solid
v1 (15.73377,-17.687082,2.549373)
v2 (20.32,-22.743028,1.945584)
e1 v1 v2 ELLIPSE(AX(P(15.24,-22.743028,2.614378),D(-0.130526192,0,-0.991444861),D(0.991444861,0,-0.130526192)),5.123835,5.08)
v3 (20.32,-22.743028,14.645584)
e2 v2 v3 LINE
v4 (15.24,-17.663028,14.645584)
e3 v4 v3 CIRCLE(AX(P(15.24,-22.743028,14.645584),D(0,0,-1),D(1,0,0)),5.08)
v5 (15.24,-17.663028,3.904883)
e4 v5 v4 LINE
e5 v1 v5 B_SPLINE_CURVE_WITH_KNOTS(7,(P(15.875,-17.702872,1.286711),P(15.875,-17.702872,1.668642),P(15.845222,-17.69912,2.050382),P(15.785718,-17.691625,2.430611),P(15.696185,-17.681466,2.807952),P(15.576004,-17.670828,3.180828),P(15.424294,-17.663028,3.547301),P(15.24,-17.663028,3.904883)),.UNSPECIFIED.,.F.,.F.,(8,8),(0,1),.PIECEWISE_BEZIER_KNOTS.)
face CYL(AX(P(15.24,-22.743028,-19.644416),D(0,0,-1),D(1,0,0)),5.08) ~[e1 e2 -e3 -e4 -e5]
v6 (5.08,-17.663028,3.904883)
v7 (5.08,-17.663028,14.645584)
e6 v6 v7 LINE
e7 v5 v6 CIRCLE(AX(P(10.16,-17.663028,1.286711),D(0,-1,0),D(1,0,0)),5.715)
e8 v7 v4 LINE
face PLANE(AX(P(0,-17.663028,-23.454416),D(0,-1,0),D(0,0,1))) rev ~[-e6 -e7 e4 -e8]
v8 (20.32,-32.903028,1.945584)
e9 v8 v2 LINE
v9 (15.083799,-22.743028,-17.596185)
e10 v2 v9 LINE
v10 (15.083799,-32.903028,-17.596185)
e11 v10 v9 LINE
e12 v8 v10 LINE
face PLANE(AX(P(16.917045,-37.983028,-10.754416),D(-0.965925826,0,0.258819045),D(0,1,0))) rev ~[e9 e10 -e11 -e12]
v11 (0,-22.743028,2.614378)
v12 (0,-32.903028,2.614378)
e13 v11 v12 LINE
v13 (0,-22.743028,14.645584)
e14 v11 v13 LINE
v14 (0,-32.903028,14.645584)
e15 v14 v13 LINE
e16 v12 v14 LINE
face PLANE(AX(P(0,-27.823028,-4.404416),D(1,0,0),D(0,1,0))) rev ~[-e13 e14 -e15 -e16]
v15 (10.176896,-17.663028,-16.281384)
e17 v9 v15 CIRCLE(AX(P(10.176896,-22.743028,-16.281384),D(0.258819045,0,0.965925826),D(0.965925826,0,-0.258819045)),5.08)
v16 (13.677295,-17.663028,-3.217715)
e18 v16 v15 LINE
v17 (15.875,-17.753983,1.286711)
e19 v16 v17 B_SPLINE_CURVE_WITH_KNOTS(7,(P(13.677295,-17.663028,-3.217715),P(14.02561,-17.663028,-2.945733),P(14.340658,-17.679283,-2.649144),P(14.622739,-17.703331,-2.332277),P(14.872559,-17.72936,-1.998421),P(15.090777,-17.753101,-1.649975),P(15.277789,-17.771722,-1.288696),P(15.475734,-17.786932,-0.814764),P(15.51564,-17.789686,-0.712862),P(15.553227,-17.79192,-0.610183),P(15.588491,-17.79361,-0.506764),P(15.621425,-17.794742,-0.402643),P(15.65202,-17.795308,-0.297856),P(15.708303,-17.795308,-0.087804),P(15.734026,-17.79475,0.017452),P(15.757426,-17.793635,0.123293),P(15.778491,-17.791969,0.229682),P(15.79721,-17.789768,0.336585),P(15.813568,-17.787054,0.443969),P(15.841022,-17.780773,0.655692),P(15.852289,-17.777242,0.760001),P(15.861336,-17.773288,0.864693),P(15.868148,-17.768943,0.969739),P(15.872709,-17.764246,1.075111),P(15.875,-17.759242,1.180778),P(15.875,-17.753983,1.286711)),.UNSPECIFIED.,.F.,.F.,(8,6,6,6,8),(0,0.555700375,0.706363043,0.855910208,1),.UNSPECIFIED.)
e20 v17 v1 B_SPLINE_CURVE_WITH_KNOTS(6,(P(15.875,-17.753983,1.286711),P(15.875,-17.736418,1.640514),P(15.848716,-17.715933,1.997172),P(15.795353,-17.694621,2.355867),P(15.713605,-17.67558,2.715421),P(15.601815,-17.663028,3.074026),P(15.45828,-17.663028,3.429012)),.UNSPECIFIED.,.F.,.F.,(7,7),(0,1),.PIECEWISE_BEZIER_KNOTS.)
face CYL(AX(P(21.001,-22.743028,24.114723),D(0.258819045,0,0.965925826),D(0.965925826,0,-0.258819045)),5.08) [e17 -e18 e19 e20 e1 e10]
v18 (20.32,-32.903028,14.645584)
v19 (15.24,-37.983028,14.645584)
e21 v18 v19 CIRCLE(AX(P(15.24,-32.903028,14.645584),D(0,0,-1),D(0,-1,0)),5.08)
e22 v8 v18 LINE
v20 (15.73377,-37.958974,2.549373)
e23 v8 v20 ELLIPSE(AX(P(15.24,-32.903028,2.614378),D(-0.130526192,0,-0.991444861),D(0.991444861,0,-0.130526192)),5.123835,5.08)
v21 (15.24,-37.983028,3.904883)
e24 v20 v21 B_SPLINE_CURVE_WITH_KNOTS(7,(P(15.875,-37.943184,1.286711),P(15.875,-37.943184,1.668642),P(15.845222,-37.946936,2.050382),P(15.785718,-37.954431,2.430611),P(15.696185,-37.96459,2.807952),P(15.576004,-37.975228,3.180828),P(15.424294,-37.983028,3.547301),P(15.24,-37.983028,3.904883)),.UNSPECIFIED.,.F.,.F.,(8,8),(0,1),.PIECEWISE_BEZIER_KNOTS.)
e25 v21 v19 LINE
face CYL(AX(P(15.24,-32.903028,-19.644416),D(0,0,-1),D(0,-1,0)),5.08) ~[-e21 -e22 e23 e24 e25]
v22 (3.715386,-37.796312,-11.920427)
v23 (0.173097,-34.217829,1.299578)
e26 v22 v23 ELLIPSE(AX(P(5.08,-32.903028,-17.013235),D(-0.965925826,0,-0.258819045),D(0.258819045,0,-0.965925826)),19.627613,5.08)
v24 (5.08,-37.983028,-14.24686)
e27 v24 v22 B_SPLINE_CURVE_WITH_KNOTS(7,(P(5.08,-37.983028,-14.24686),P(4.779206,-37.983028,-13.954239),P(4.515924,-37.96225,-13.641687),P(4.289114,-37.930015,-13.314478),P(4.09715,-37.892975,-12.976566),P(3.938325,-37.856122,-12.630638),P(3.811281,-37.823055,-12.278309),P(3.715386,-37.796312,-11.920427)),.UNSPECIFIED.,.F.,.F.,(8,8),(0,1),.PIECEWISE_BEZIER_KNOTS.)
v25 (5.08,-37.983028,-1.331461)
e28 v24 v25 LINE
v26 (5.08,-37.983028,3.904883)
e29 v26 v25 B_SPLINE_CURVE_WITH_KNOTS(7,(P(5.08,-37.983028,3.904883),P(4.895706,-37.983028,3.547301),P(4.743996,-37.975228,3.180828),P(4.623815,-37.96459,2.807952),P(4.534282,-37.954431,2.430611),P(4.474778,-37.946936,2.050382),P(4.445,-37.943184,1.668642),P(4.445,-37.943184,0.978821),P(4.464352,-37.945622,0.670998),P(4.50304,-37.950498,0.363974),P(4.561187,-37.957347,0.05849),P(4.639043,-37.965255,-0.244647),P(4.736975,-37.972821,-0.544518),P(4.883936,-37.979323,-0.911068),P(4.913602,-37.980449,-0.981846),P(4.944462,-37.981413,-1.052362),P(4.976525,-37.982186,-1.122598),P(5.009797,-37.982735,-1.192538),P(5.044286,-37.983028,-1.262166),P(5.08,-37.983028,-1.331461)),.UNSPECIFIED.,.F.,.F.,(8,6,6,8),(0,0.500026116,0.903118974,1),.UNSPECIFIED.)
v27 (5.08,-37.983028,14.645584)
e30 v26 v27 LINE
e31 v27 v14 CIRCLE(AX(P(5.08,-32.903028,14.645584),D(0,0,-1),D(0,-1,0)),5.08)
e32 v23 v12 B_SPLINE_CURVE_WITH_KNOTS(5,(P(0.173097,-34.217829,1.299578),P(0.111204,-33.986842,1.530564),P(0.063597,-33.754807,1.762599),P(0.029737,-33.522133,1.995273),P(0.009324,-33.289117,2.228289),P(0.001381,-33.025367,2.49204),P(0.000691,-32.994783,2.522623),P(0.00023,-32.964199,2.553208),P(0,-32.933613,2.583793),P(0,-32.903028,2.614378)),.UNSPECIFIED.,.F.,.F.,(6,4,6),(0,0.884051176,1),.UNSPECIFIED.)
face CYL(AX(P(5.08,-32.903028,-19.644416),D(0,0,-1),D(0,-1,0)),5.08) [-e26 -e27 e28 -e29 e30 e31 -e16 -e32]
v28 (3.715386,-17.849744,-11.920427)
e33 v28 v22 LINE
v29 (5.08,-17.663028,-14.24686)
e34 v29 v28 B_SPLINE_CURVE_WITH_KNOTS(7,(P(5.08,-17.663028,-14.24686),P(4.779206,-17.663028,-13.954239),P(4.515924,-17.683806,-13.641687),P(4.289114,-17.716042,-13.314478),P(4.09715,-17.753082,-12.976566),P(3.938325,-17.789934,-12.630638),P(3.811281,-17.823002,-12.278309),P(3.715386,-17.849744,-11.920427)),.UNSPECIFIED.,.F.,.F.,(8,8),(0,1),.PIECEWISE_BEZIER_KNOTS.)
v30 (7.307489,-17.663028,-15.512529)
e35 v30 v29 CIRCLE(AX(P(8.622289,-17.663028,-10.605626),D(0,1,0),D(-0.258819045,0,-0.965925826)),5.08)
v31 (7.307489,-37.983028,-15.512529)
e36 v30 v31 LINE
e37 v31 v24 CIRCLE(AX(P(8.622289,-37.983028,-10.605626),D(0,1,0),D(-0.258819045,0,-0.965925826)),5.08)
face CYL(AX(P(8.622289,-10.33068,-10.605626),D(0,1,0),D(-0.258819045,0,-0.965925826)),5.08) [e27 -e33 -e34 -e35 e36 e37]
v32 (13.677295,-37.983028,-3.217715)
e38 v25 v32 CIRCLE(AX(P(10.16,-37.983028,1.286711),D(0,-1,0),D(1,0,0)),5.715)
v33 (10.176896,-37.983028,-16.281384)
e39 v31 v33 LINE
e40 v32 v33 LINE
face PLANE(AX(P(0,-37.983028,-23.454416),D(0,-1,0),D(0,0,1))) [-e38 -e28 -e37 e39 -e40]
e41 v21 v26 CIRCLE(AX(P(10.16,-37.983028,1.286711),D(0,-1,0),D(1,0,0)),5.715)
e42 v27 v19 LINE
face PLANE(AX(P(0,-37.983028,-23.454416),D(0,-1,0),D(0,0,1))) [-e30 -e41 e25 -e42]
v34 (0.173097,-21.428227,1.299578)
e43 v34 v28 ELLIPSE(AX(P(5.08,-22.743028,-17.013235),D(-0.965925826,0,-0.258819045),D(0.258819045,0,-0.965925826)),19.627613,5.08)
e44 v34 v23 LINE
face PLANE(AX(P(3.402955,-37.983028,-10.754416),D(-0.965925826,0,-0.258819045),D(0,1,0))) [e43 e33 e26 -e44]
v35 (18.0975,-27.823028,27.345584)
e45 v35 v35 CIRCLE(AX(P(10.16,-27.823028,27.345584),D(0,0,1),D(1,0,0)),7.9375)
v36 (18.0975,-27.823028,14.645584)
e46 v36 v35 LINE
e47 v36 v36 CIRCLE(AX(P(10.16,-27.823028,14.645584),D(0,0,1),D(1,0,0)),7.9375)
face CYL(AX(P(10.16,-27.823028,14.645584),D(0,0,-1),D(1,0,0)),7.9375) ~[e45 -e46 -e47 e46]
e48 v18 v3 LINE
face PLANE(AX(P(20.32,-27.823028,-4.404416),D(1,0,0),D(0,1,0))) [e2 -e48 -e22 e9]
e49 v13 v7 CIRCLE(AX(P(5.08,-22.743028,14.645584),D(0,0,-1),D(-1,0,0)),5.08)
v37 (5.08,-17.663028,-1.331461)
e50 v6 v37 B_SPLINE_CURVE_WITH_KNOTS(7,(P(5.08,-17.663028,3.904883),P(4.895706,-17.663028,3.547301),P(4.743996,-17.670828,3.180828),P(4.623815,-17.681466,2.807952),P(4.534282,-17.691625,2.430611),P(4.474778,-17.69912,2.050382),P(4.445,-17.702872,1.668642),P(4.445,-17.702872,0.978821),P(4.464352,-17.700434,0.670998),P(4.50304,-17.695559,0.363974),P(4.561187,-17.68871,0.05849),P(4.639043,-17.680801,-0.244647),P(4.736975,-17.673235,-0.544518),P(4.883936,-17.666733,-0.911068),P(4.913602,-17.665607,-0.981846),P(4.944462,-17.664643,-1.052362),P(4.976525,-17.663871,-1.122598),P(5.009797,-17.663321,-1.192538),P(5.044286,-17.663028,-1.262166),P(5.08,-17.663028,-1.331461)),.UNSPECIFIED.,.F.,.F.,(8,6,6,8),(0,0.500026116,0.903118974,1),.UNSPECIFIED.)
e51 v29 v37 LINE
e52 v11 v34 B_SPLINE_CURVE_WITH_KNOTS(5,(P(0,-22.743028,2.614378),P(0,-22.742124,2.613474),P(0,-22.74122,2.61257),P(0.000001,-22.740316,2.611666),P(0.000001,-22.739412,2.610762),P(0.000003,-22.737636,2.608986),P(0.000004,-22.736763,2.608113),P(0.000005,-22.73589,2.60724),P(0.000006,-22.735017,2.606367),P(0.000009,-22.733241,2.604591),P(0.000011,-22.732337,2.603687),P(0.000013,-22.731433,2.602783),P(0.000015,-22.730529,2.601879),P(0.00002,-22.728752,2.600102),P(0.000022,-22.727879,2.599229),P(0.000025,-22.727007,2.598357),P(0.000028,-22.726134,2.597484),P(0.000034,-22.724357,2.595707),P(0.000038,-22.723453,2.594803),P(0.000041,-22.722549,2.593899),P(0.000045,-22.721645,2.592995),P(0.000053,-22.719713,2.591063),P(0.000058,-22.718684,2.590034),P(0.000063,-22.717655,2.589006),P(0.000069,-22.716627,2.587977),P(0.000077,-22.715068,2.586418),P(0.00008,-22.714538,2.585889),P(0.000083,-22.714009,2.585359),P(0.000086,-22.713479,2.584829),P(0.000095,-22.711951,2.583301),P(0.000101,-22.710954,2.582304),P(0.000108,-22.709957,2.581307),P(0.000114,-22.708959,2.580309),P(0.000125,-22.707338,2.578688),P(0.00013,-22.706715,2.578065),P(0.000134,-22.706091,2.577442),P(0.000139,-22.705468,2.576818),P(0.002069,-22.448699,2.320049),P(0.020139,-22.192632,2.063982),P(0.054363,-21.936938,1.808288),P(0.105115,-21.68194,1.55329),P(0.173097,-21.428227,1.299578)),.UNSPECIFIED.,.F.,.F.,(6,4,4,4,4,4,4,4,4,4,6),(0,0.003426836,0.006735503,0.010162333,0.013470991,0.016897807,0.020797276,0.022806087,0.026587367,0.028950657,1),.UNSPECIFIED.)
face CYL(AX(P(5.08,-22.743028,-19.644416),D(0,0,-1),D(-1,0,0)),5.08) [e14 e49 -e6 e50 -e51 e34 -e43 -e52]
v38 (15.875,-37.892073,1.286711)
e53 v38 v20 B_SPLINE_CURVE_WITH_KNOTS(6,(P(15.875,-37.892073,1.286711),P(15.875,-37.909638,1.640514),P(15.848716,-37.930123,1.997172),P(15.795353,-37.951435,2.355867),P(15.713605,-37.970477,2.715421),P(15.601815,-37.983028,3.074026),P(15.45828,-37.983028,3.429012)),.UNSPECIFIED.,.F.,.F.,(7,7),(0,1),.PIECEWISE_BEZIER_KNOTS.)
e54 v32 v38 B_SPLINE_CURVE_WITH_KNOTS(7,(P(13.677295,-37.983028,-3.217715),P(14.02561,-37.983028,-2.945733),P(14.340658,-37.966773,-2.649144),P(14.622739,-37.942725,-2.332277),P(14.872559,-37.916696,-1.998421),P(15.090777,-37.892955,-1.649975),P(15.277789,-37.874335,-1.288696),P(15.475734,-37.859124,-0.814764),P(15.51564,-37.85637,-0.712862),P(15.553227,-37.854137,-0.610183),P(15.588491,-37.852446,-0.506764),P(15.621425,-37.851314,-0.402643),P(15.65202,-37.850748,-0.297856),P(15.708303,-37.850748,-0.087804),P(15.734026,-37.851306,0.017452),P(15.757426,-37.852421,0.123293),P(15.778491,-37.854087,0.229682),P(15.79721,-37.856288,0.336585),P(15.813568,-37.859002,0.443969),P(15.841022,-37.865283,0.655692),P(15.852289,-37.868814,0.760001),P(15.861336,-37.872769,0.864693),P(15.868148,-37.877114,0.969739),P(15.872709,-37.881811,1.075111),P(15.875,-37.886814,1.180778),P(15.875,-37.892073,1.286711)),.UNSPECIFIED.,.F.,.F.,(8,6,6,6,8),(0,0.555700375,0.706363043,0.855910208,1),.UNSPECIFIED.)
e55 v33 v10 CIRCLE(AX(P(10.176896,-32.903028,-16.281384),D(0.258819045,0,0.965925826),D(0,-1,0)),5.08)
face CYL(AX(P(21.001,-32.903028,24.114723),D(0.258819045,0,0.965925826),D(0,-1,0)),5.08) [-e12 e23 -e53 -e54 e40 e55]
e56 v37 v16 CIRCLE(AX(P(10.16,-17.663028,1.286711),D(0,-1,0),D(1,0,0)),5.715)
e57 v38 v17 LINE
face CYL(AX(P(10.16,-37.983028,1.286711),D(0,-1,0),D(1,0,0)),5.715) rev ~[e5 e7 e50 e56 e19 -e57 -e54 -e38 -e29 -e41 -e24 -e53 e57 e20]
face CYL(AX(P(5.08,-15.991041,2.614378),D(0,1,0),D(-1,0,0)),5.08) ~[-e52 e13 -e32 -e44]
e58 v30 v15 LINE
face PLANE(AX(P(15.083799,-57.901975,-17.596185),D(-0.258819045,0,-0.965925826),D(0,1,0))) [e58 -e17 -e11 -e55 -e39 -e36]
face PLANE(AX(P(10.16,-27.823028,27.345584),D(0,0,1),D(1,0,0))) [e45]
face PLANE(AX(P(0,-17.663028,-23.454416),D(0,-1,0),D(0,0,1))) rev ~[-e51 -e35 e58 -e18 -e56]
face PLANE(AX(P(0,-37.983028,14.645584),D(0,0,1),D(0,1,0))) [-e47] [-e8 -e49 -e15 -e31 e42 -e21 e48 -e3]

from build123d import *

# Parameters (mm, degrees)
F0_W        = 20.32
F0_H        = 38.1
F1_DEPTH    = 20.32
F2_SIZE2    = 6.8059094878
F2_SIZE     = 25.4
F2_2_SIZE2  = 6.8059094878
F2_2_SIZE   = 25.4
F3_R        = 5.715
F4_DEPTH    = 25.4
F5_W        = 68.5800006613
F5_H        = 10.5876065791
F6_DEPTH    = 35.56
F7_R        = 7.9375
F8_DEPTH    = 12.7
F9_T1_DEPTH = 46.99
F9_T3_DEPTH = 54.5211276147
F9_T5_DEPTH = 34.9846968374
F9_T7_DEPTH = 23.6639734387


# Not quite as in the source:
# - a fillet or chamfer that OpenCascade refuses, or shapes differently, is made with other operations: its cross-section is extruded or revolved along the edge and cut away or added


with BuildPart() as f1:
    # F0 (on Right) → F1 (new body)
    with BuildSketch(Plane.YZ):
        with Locations((-27.8230281547, -4.4044164286)):
            Rectangle(F0_W, F0_H)
    extrude(amount=F1_DEPTH)

    # F2
    f2_edges = [f1.edges().sort_by_distance(p)[0] for p in [
        (20.32, -27.823028, -23.454416),
    ]]
    f2_side = f1.faces().sort_by_distance((20.32, -27.823028, -4.404416))[0]
    chamfer(f2_edges, length=F2_SIZE, length2=F2_SIZE2, reference=f2_side)

    # F2#2
    f2_2_edges = [f1.edges().sort_by_distance(p)[0] for p in [
        (0, -27.823028, -23.454416),
    ]]
    f2_2_side = f1.faces().sort_by_distance((0, -27.823028, -4.404416))[0]
    chamfer(f2_2_edges, length=F2_2_SIZE, length2=F2_2_SIZE2, reference=f2_2_side)

    # F3 (on face) → F4 (cut)
    with BuildSketch(Plane.XZ.offset(37.9830281547)):
        with Locations((10.16, 1.2867113903)):
            Circle(F3_R)
    extrude(amount=-F4_DEPTH, mode=Mode.SUBTRACT)

    # F5 (on face) → F6 (cut)
    with BuildSketch(Plane(origin=(18.4724222096, 0, -4.9496706133), x_dir=(0, 1, 0), z_dir=(0.9659258263, 0, -0.2588190451))):
        with Locations((-23.6119744368, -18.386438489)):
            Rectangle(F5_W, F5_H)
    extrude(amount=-F6_DEPTH, mode=Mode.SUBTRACT)

    # F7 (on face) → F8 (join)
    with BuildSketch(Plane.XY.offset(14.6455835714)):
        with Locations((10.16, -27.8230281547)):
            Circle(F7_R)
    extrude(amount=F8_DEPTH)

    # F9: fillet of radius 5.08 on 8 edges, made by hand

    # F9_s2 → F9_t1 (cut)
    with BuildSketch(Plane.XY.offset(-19.6444164286)):
        with BuildLine():
            ThreePointArc((20.32, -22.7430281547), (18.8321024484, -19.1509257062), (15.24, -17.6630281547))
            Line((15.24, -17.6630281547), (20.32, -17.6630281547))
            Line((20.32, -17.6630281547), (20.32, -22.7430281547))
        make_face()
        with BuildLine():
            ThreePointArc((0, -22.7430281547), (1.4878975516, -19.1509257062), (5.08, -17.6630281547))
            Line((5.08, -17.6630281547), (0, -17.6630281547))
            Line((0, -17.6630281547), (0, -22.7430281547))
        make_face()
        with BuildLine():
            ThreePointArc((5.08, -37.9830281547), (1.4878975516, -36.4951306031), (0, -32.9030281547))
            Line((0, -32.9030281547), (0, -37.9830281547))
            Line((0, -37.9830281547), (5.08, -37.9830281547))
        make_face()
        with BuildLine():
            ThreePointArc((15.24, -37.9830281547), (18.8321024484, -36.4951306031), (20.32, -32.9030281547))
            Line((20.32, -32.9030281547), (20.32, -37.9830281547))
            Line((20.32, -37.9830281547), (15.24, -37.9830281547))
        make_face()
    extrude(amount=F9_T1_DEPTH, mode=Mode.SUBTRACT)

    # F9_s4 → F9_t3 (cut)
    with BuildSketch(Plane(origin=(7.4354809742, 0, 27.7495927742), x_dir=(0, 1, 0), z_dir=(-0.2588190451, 0, -0.9659258263))):
        with BuildLine():
            ThreePointArc((-37.9830281547, 14.0440587081), (-36.4951306031, 17.6361611565), (-32.9030281547, 19.1240587081))
            Line((-32.9030281547, 19.1240587081), (-37.9830281547, 19.1240587081))
            Line((-37.9830281547, 19.1240587081), (-37.9830281547, 14.0440587081))
        make_face()
        with BuildLine():
            ThreePointArc((-22.7430281547, 19.1240587081), (-19.1509257062, 17.6361611565), (-17.6630281547, 14.0440587081))
            Line((-17.6630281547, 14.0440587081), (-17.6630281547, 19.1240587081))
            Line((-17.6630281547, 19.1240587081), (-22.7430281547, 19.1240587081))
        make_face()
    extrude(amount=F9_T3_DEPTH, mode=Mode.SUBTRACT)

    # F9_s6 → F9_t5 (cut)
    with BuildSketch(Plane.XZ.offset(10.330679736)):
        with BuildLine():
            ThreePointArc((7.3074886766, -15.5125290504), (5.0301869773, -14.1977283012), (3.7153862282, -11.9204266019))
            Line((3.7153862282, -11.9204266019), (4.4744867946, -14.7534284839))
            Line((4.4744867946, -14.7534284839), (7.3074886766, -15.5125290504))
        make_face()
    extrude(amount=F9_T5_DEPTH, mode=Mode.SUBTRACT)

    # F9_s8 → F9_t7 (cut)
    with BuildSketch(Plane.XZ.offset(15.9910414353)):
        with BuildLine():
            ThreePointArc((0, 2.6143782591), (0.0434601042, 1.9513052026), (0.1730968025, 1.29957751))
            Line((0.1730968025, 1.29957751), (0, 1.9455835714))
            Line((0, 1.9455835714), (0, 2.6143782591))
        make_face()
    extrude(amount=F9_T7_DEPTH, mode=Mode.SUBTRACT)


solid = f1.part
